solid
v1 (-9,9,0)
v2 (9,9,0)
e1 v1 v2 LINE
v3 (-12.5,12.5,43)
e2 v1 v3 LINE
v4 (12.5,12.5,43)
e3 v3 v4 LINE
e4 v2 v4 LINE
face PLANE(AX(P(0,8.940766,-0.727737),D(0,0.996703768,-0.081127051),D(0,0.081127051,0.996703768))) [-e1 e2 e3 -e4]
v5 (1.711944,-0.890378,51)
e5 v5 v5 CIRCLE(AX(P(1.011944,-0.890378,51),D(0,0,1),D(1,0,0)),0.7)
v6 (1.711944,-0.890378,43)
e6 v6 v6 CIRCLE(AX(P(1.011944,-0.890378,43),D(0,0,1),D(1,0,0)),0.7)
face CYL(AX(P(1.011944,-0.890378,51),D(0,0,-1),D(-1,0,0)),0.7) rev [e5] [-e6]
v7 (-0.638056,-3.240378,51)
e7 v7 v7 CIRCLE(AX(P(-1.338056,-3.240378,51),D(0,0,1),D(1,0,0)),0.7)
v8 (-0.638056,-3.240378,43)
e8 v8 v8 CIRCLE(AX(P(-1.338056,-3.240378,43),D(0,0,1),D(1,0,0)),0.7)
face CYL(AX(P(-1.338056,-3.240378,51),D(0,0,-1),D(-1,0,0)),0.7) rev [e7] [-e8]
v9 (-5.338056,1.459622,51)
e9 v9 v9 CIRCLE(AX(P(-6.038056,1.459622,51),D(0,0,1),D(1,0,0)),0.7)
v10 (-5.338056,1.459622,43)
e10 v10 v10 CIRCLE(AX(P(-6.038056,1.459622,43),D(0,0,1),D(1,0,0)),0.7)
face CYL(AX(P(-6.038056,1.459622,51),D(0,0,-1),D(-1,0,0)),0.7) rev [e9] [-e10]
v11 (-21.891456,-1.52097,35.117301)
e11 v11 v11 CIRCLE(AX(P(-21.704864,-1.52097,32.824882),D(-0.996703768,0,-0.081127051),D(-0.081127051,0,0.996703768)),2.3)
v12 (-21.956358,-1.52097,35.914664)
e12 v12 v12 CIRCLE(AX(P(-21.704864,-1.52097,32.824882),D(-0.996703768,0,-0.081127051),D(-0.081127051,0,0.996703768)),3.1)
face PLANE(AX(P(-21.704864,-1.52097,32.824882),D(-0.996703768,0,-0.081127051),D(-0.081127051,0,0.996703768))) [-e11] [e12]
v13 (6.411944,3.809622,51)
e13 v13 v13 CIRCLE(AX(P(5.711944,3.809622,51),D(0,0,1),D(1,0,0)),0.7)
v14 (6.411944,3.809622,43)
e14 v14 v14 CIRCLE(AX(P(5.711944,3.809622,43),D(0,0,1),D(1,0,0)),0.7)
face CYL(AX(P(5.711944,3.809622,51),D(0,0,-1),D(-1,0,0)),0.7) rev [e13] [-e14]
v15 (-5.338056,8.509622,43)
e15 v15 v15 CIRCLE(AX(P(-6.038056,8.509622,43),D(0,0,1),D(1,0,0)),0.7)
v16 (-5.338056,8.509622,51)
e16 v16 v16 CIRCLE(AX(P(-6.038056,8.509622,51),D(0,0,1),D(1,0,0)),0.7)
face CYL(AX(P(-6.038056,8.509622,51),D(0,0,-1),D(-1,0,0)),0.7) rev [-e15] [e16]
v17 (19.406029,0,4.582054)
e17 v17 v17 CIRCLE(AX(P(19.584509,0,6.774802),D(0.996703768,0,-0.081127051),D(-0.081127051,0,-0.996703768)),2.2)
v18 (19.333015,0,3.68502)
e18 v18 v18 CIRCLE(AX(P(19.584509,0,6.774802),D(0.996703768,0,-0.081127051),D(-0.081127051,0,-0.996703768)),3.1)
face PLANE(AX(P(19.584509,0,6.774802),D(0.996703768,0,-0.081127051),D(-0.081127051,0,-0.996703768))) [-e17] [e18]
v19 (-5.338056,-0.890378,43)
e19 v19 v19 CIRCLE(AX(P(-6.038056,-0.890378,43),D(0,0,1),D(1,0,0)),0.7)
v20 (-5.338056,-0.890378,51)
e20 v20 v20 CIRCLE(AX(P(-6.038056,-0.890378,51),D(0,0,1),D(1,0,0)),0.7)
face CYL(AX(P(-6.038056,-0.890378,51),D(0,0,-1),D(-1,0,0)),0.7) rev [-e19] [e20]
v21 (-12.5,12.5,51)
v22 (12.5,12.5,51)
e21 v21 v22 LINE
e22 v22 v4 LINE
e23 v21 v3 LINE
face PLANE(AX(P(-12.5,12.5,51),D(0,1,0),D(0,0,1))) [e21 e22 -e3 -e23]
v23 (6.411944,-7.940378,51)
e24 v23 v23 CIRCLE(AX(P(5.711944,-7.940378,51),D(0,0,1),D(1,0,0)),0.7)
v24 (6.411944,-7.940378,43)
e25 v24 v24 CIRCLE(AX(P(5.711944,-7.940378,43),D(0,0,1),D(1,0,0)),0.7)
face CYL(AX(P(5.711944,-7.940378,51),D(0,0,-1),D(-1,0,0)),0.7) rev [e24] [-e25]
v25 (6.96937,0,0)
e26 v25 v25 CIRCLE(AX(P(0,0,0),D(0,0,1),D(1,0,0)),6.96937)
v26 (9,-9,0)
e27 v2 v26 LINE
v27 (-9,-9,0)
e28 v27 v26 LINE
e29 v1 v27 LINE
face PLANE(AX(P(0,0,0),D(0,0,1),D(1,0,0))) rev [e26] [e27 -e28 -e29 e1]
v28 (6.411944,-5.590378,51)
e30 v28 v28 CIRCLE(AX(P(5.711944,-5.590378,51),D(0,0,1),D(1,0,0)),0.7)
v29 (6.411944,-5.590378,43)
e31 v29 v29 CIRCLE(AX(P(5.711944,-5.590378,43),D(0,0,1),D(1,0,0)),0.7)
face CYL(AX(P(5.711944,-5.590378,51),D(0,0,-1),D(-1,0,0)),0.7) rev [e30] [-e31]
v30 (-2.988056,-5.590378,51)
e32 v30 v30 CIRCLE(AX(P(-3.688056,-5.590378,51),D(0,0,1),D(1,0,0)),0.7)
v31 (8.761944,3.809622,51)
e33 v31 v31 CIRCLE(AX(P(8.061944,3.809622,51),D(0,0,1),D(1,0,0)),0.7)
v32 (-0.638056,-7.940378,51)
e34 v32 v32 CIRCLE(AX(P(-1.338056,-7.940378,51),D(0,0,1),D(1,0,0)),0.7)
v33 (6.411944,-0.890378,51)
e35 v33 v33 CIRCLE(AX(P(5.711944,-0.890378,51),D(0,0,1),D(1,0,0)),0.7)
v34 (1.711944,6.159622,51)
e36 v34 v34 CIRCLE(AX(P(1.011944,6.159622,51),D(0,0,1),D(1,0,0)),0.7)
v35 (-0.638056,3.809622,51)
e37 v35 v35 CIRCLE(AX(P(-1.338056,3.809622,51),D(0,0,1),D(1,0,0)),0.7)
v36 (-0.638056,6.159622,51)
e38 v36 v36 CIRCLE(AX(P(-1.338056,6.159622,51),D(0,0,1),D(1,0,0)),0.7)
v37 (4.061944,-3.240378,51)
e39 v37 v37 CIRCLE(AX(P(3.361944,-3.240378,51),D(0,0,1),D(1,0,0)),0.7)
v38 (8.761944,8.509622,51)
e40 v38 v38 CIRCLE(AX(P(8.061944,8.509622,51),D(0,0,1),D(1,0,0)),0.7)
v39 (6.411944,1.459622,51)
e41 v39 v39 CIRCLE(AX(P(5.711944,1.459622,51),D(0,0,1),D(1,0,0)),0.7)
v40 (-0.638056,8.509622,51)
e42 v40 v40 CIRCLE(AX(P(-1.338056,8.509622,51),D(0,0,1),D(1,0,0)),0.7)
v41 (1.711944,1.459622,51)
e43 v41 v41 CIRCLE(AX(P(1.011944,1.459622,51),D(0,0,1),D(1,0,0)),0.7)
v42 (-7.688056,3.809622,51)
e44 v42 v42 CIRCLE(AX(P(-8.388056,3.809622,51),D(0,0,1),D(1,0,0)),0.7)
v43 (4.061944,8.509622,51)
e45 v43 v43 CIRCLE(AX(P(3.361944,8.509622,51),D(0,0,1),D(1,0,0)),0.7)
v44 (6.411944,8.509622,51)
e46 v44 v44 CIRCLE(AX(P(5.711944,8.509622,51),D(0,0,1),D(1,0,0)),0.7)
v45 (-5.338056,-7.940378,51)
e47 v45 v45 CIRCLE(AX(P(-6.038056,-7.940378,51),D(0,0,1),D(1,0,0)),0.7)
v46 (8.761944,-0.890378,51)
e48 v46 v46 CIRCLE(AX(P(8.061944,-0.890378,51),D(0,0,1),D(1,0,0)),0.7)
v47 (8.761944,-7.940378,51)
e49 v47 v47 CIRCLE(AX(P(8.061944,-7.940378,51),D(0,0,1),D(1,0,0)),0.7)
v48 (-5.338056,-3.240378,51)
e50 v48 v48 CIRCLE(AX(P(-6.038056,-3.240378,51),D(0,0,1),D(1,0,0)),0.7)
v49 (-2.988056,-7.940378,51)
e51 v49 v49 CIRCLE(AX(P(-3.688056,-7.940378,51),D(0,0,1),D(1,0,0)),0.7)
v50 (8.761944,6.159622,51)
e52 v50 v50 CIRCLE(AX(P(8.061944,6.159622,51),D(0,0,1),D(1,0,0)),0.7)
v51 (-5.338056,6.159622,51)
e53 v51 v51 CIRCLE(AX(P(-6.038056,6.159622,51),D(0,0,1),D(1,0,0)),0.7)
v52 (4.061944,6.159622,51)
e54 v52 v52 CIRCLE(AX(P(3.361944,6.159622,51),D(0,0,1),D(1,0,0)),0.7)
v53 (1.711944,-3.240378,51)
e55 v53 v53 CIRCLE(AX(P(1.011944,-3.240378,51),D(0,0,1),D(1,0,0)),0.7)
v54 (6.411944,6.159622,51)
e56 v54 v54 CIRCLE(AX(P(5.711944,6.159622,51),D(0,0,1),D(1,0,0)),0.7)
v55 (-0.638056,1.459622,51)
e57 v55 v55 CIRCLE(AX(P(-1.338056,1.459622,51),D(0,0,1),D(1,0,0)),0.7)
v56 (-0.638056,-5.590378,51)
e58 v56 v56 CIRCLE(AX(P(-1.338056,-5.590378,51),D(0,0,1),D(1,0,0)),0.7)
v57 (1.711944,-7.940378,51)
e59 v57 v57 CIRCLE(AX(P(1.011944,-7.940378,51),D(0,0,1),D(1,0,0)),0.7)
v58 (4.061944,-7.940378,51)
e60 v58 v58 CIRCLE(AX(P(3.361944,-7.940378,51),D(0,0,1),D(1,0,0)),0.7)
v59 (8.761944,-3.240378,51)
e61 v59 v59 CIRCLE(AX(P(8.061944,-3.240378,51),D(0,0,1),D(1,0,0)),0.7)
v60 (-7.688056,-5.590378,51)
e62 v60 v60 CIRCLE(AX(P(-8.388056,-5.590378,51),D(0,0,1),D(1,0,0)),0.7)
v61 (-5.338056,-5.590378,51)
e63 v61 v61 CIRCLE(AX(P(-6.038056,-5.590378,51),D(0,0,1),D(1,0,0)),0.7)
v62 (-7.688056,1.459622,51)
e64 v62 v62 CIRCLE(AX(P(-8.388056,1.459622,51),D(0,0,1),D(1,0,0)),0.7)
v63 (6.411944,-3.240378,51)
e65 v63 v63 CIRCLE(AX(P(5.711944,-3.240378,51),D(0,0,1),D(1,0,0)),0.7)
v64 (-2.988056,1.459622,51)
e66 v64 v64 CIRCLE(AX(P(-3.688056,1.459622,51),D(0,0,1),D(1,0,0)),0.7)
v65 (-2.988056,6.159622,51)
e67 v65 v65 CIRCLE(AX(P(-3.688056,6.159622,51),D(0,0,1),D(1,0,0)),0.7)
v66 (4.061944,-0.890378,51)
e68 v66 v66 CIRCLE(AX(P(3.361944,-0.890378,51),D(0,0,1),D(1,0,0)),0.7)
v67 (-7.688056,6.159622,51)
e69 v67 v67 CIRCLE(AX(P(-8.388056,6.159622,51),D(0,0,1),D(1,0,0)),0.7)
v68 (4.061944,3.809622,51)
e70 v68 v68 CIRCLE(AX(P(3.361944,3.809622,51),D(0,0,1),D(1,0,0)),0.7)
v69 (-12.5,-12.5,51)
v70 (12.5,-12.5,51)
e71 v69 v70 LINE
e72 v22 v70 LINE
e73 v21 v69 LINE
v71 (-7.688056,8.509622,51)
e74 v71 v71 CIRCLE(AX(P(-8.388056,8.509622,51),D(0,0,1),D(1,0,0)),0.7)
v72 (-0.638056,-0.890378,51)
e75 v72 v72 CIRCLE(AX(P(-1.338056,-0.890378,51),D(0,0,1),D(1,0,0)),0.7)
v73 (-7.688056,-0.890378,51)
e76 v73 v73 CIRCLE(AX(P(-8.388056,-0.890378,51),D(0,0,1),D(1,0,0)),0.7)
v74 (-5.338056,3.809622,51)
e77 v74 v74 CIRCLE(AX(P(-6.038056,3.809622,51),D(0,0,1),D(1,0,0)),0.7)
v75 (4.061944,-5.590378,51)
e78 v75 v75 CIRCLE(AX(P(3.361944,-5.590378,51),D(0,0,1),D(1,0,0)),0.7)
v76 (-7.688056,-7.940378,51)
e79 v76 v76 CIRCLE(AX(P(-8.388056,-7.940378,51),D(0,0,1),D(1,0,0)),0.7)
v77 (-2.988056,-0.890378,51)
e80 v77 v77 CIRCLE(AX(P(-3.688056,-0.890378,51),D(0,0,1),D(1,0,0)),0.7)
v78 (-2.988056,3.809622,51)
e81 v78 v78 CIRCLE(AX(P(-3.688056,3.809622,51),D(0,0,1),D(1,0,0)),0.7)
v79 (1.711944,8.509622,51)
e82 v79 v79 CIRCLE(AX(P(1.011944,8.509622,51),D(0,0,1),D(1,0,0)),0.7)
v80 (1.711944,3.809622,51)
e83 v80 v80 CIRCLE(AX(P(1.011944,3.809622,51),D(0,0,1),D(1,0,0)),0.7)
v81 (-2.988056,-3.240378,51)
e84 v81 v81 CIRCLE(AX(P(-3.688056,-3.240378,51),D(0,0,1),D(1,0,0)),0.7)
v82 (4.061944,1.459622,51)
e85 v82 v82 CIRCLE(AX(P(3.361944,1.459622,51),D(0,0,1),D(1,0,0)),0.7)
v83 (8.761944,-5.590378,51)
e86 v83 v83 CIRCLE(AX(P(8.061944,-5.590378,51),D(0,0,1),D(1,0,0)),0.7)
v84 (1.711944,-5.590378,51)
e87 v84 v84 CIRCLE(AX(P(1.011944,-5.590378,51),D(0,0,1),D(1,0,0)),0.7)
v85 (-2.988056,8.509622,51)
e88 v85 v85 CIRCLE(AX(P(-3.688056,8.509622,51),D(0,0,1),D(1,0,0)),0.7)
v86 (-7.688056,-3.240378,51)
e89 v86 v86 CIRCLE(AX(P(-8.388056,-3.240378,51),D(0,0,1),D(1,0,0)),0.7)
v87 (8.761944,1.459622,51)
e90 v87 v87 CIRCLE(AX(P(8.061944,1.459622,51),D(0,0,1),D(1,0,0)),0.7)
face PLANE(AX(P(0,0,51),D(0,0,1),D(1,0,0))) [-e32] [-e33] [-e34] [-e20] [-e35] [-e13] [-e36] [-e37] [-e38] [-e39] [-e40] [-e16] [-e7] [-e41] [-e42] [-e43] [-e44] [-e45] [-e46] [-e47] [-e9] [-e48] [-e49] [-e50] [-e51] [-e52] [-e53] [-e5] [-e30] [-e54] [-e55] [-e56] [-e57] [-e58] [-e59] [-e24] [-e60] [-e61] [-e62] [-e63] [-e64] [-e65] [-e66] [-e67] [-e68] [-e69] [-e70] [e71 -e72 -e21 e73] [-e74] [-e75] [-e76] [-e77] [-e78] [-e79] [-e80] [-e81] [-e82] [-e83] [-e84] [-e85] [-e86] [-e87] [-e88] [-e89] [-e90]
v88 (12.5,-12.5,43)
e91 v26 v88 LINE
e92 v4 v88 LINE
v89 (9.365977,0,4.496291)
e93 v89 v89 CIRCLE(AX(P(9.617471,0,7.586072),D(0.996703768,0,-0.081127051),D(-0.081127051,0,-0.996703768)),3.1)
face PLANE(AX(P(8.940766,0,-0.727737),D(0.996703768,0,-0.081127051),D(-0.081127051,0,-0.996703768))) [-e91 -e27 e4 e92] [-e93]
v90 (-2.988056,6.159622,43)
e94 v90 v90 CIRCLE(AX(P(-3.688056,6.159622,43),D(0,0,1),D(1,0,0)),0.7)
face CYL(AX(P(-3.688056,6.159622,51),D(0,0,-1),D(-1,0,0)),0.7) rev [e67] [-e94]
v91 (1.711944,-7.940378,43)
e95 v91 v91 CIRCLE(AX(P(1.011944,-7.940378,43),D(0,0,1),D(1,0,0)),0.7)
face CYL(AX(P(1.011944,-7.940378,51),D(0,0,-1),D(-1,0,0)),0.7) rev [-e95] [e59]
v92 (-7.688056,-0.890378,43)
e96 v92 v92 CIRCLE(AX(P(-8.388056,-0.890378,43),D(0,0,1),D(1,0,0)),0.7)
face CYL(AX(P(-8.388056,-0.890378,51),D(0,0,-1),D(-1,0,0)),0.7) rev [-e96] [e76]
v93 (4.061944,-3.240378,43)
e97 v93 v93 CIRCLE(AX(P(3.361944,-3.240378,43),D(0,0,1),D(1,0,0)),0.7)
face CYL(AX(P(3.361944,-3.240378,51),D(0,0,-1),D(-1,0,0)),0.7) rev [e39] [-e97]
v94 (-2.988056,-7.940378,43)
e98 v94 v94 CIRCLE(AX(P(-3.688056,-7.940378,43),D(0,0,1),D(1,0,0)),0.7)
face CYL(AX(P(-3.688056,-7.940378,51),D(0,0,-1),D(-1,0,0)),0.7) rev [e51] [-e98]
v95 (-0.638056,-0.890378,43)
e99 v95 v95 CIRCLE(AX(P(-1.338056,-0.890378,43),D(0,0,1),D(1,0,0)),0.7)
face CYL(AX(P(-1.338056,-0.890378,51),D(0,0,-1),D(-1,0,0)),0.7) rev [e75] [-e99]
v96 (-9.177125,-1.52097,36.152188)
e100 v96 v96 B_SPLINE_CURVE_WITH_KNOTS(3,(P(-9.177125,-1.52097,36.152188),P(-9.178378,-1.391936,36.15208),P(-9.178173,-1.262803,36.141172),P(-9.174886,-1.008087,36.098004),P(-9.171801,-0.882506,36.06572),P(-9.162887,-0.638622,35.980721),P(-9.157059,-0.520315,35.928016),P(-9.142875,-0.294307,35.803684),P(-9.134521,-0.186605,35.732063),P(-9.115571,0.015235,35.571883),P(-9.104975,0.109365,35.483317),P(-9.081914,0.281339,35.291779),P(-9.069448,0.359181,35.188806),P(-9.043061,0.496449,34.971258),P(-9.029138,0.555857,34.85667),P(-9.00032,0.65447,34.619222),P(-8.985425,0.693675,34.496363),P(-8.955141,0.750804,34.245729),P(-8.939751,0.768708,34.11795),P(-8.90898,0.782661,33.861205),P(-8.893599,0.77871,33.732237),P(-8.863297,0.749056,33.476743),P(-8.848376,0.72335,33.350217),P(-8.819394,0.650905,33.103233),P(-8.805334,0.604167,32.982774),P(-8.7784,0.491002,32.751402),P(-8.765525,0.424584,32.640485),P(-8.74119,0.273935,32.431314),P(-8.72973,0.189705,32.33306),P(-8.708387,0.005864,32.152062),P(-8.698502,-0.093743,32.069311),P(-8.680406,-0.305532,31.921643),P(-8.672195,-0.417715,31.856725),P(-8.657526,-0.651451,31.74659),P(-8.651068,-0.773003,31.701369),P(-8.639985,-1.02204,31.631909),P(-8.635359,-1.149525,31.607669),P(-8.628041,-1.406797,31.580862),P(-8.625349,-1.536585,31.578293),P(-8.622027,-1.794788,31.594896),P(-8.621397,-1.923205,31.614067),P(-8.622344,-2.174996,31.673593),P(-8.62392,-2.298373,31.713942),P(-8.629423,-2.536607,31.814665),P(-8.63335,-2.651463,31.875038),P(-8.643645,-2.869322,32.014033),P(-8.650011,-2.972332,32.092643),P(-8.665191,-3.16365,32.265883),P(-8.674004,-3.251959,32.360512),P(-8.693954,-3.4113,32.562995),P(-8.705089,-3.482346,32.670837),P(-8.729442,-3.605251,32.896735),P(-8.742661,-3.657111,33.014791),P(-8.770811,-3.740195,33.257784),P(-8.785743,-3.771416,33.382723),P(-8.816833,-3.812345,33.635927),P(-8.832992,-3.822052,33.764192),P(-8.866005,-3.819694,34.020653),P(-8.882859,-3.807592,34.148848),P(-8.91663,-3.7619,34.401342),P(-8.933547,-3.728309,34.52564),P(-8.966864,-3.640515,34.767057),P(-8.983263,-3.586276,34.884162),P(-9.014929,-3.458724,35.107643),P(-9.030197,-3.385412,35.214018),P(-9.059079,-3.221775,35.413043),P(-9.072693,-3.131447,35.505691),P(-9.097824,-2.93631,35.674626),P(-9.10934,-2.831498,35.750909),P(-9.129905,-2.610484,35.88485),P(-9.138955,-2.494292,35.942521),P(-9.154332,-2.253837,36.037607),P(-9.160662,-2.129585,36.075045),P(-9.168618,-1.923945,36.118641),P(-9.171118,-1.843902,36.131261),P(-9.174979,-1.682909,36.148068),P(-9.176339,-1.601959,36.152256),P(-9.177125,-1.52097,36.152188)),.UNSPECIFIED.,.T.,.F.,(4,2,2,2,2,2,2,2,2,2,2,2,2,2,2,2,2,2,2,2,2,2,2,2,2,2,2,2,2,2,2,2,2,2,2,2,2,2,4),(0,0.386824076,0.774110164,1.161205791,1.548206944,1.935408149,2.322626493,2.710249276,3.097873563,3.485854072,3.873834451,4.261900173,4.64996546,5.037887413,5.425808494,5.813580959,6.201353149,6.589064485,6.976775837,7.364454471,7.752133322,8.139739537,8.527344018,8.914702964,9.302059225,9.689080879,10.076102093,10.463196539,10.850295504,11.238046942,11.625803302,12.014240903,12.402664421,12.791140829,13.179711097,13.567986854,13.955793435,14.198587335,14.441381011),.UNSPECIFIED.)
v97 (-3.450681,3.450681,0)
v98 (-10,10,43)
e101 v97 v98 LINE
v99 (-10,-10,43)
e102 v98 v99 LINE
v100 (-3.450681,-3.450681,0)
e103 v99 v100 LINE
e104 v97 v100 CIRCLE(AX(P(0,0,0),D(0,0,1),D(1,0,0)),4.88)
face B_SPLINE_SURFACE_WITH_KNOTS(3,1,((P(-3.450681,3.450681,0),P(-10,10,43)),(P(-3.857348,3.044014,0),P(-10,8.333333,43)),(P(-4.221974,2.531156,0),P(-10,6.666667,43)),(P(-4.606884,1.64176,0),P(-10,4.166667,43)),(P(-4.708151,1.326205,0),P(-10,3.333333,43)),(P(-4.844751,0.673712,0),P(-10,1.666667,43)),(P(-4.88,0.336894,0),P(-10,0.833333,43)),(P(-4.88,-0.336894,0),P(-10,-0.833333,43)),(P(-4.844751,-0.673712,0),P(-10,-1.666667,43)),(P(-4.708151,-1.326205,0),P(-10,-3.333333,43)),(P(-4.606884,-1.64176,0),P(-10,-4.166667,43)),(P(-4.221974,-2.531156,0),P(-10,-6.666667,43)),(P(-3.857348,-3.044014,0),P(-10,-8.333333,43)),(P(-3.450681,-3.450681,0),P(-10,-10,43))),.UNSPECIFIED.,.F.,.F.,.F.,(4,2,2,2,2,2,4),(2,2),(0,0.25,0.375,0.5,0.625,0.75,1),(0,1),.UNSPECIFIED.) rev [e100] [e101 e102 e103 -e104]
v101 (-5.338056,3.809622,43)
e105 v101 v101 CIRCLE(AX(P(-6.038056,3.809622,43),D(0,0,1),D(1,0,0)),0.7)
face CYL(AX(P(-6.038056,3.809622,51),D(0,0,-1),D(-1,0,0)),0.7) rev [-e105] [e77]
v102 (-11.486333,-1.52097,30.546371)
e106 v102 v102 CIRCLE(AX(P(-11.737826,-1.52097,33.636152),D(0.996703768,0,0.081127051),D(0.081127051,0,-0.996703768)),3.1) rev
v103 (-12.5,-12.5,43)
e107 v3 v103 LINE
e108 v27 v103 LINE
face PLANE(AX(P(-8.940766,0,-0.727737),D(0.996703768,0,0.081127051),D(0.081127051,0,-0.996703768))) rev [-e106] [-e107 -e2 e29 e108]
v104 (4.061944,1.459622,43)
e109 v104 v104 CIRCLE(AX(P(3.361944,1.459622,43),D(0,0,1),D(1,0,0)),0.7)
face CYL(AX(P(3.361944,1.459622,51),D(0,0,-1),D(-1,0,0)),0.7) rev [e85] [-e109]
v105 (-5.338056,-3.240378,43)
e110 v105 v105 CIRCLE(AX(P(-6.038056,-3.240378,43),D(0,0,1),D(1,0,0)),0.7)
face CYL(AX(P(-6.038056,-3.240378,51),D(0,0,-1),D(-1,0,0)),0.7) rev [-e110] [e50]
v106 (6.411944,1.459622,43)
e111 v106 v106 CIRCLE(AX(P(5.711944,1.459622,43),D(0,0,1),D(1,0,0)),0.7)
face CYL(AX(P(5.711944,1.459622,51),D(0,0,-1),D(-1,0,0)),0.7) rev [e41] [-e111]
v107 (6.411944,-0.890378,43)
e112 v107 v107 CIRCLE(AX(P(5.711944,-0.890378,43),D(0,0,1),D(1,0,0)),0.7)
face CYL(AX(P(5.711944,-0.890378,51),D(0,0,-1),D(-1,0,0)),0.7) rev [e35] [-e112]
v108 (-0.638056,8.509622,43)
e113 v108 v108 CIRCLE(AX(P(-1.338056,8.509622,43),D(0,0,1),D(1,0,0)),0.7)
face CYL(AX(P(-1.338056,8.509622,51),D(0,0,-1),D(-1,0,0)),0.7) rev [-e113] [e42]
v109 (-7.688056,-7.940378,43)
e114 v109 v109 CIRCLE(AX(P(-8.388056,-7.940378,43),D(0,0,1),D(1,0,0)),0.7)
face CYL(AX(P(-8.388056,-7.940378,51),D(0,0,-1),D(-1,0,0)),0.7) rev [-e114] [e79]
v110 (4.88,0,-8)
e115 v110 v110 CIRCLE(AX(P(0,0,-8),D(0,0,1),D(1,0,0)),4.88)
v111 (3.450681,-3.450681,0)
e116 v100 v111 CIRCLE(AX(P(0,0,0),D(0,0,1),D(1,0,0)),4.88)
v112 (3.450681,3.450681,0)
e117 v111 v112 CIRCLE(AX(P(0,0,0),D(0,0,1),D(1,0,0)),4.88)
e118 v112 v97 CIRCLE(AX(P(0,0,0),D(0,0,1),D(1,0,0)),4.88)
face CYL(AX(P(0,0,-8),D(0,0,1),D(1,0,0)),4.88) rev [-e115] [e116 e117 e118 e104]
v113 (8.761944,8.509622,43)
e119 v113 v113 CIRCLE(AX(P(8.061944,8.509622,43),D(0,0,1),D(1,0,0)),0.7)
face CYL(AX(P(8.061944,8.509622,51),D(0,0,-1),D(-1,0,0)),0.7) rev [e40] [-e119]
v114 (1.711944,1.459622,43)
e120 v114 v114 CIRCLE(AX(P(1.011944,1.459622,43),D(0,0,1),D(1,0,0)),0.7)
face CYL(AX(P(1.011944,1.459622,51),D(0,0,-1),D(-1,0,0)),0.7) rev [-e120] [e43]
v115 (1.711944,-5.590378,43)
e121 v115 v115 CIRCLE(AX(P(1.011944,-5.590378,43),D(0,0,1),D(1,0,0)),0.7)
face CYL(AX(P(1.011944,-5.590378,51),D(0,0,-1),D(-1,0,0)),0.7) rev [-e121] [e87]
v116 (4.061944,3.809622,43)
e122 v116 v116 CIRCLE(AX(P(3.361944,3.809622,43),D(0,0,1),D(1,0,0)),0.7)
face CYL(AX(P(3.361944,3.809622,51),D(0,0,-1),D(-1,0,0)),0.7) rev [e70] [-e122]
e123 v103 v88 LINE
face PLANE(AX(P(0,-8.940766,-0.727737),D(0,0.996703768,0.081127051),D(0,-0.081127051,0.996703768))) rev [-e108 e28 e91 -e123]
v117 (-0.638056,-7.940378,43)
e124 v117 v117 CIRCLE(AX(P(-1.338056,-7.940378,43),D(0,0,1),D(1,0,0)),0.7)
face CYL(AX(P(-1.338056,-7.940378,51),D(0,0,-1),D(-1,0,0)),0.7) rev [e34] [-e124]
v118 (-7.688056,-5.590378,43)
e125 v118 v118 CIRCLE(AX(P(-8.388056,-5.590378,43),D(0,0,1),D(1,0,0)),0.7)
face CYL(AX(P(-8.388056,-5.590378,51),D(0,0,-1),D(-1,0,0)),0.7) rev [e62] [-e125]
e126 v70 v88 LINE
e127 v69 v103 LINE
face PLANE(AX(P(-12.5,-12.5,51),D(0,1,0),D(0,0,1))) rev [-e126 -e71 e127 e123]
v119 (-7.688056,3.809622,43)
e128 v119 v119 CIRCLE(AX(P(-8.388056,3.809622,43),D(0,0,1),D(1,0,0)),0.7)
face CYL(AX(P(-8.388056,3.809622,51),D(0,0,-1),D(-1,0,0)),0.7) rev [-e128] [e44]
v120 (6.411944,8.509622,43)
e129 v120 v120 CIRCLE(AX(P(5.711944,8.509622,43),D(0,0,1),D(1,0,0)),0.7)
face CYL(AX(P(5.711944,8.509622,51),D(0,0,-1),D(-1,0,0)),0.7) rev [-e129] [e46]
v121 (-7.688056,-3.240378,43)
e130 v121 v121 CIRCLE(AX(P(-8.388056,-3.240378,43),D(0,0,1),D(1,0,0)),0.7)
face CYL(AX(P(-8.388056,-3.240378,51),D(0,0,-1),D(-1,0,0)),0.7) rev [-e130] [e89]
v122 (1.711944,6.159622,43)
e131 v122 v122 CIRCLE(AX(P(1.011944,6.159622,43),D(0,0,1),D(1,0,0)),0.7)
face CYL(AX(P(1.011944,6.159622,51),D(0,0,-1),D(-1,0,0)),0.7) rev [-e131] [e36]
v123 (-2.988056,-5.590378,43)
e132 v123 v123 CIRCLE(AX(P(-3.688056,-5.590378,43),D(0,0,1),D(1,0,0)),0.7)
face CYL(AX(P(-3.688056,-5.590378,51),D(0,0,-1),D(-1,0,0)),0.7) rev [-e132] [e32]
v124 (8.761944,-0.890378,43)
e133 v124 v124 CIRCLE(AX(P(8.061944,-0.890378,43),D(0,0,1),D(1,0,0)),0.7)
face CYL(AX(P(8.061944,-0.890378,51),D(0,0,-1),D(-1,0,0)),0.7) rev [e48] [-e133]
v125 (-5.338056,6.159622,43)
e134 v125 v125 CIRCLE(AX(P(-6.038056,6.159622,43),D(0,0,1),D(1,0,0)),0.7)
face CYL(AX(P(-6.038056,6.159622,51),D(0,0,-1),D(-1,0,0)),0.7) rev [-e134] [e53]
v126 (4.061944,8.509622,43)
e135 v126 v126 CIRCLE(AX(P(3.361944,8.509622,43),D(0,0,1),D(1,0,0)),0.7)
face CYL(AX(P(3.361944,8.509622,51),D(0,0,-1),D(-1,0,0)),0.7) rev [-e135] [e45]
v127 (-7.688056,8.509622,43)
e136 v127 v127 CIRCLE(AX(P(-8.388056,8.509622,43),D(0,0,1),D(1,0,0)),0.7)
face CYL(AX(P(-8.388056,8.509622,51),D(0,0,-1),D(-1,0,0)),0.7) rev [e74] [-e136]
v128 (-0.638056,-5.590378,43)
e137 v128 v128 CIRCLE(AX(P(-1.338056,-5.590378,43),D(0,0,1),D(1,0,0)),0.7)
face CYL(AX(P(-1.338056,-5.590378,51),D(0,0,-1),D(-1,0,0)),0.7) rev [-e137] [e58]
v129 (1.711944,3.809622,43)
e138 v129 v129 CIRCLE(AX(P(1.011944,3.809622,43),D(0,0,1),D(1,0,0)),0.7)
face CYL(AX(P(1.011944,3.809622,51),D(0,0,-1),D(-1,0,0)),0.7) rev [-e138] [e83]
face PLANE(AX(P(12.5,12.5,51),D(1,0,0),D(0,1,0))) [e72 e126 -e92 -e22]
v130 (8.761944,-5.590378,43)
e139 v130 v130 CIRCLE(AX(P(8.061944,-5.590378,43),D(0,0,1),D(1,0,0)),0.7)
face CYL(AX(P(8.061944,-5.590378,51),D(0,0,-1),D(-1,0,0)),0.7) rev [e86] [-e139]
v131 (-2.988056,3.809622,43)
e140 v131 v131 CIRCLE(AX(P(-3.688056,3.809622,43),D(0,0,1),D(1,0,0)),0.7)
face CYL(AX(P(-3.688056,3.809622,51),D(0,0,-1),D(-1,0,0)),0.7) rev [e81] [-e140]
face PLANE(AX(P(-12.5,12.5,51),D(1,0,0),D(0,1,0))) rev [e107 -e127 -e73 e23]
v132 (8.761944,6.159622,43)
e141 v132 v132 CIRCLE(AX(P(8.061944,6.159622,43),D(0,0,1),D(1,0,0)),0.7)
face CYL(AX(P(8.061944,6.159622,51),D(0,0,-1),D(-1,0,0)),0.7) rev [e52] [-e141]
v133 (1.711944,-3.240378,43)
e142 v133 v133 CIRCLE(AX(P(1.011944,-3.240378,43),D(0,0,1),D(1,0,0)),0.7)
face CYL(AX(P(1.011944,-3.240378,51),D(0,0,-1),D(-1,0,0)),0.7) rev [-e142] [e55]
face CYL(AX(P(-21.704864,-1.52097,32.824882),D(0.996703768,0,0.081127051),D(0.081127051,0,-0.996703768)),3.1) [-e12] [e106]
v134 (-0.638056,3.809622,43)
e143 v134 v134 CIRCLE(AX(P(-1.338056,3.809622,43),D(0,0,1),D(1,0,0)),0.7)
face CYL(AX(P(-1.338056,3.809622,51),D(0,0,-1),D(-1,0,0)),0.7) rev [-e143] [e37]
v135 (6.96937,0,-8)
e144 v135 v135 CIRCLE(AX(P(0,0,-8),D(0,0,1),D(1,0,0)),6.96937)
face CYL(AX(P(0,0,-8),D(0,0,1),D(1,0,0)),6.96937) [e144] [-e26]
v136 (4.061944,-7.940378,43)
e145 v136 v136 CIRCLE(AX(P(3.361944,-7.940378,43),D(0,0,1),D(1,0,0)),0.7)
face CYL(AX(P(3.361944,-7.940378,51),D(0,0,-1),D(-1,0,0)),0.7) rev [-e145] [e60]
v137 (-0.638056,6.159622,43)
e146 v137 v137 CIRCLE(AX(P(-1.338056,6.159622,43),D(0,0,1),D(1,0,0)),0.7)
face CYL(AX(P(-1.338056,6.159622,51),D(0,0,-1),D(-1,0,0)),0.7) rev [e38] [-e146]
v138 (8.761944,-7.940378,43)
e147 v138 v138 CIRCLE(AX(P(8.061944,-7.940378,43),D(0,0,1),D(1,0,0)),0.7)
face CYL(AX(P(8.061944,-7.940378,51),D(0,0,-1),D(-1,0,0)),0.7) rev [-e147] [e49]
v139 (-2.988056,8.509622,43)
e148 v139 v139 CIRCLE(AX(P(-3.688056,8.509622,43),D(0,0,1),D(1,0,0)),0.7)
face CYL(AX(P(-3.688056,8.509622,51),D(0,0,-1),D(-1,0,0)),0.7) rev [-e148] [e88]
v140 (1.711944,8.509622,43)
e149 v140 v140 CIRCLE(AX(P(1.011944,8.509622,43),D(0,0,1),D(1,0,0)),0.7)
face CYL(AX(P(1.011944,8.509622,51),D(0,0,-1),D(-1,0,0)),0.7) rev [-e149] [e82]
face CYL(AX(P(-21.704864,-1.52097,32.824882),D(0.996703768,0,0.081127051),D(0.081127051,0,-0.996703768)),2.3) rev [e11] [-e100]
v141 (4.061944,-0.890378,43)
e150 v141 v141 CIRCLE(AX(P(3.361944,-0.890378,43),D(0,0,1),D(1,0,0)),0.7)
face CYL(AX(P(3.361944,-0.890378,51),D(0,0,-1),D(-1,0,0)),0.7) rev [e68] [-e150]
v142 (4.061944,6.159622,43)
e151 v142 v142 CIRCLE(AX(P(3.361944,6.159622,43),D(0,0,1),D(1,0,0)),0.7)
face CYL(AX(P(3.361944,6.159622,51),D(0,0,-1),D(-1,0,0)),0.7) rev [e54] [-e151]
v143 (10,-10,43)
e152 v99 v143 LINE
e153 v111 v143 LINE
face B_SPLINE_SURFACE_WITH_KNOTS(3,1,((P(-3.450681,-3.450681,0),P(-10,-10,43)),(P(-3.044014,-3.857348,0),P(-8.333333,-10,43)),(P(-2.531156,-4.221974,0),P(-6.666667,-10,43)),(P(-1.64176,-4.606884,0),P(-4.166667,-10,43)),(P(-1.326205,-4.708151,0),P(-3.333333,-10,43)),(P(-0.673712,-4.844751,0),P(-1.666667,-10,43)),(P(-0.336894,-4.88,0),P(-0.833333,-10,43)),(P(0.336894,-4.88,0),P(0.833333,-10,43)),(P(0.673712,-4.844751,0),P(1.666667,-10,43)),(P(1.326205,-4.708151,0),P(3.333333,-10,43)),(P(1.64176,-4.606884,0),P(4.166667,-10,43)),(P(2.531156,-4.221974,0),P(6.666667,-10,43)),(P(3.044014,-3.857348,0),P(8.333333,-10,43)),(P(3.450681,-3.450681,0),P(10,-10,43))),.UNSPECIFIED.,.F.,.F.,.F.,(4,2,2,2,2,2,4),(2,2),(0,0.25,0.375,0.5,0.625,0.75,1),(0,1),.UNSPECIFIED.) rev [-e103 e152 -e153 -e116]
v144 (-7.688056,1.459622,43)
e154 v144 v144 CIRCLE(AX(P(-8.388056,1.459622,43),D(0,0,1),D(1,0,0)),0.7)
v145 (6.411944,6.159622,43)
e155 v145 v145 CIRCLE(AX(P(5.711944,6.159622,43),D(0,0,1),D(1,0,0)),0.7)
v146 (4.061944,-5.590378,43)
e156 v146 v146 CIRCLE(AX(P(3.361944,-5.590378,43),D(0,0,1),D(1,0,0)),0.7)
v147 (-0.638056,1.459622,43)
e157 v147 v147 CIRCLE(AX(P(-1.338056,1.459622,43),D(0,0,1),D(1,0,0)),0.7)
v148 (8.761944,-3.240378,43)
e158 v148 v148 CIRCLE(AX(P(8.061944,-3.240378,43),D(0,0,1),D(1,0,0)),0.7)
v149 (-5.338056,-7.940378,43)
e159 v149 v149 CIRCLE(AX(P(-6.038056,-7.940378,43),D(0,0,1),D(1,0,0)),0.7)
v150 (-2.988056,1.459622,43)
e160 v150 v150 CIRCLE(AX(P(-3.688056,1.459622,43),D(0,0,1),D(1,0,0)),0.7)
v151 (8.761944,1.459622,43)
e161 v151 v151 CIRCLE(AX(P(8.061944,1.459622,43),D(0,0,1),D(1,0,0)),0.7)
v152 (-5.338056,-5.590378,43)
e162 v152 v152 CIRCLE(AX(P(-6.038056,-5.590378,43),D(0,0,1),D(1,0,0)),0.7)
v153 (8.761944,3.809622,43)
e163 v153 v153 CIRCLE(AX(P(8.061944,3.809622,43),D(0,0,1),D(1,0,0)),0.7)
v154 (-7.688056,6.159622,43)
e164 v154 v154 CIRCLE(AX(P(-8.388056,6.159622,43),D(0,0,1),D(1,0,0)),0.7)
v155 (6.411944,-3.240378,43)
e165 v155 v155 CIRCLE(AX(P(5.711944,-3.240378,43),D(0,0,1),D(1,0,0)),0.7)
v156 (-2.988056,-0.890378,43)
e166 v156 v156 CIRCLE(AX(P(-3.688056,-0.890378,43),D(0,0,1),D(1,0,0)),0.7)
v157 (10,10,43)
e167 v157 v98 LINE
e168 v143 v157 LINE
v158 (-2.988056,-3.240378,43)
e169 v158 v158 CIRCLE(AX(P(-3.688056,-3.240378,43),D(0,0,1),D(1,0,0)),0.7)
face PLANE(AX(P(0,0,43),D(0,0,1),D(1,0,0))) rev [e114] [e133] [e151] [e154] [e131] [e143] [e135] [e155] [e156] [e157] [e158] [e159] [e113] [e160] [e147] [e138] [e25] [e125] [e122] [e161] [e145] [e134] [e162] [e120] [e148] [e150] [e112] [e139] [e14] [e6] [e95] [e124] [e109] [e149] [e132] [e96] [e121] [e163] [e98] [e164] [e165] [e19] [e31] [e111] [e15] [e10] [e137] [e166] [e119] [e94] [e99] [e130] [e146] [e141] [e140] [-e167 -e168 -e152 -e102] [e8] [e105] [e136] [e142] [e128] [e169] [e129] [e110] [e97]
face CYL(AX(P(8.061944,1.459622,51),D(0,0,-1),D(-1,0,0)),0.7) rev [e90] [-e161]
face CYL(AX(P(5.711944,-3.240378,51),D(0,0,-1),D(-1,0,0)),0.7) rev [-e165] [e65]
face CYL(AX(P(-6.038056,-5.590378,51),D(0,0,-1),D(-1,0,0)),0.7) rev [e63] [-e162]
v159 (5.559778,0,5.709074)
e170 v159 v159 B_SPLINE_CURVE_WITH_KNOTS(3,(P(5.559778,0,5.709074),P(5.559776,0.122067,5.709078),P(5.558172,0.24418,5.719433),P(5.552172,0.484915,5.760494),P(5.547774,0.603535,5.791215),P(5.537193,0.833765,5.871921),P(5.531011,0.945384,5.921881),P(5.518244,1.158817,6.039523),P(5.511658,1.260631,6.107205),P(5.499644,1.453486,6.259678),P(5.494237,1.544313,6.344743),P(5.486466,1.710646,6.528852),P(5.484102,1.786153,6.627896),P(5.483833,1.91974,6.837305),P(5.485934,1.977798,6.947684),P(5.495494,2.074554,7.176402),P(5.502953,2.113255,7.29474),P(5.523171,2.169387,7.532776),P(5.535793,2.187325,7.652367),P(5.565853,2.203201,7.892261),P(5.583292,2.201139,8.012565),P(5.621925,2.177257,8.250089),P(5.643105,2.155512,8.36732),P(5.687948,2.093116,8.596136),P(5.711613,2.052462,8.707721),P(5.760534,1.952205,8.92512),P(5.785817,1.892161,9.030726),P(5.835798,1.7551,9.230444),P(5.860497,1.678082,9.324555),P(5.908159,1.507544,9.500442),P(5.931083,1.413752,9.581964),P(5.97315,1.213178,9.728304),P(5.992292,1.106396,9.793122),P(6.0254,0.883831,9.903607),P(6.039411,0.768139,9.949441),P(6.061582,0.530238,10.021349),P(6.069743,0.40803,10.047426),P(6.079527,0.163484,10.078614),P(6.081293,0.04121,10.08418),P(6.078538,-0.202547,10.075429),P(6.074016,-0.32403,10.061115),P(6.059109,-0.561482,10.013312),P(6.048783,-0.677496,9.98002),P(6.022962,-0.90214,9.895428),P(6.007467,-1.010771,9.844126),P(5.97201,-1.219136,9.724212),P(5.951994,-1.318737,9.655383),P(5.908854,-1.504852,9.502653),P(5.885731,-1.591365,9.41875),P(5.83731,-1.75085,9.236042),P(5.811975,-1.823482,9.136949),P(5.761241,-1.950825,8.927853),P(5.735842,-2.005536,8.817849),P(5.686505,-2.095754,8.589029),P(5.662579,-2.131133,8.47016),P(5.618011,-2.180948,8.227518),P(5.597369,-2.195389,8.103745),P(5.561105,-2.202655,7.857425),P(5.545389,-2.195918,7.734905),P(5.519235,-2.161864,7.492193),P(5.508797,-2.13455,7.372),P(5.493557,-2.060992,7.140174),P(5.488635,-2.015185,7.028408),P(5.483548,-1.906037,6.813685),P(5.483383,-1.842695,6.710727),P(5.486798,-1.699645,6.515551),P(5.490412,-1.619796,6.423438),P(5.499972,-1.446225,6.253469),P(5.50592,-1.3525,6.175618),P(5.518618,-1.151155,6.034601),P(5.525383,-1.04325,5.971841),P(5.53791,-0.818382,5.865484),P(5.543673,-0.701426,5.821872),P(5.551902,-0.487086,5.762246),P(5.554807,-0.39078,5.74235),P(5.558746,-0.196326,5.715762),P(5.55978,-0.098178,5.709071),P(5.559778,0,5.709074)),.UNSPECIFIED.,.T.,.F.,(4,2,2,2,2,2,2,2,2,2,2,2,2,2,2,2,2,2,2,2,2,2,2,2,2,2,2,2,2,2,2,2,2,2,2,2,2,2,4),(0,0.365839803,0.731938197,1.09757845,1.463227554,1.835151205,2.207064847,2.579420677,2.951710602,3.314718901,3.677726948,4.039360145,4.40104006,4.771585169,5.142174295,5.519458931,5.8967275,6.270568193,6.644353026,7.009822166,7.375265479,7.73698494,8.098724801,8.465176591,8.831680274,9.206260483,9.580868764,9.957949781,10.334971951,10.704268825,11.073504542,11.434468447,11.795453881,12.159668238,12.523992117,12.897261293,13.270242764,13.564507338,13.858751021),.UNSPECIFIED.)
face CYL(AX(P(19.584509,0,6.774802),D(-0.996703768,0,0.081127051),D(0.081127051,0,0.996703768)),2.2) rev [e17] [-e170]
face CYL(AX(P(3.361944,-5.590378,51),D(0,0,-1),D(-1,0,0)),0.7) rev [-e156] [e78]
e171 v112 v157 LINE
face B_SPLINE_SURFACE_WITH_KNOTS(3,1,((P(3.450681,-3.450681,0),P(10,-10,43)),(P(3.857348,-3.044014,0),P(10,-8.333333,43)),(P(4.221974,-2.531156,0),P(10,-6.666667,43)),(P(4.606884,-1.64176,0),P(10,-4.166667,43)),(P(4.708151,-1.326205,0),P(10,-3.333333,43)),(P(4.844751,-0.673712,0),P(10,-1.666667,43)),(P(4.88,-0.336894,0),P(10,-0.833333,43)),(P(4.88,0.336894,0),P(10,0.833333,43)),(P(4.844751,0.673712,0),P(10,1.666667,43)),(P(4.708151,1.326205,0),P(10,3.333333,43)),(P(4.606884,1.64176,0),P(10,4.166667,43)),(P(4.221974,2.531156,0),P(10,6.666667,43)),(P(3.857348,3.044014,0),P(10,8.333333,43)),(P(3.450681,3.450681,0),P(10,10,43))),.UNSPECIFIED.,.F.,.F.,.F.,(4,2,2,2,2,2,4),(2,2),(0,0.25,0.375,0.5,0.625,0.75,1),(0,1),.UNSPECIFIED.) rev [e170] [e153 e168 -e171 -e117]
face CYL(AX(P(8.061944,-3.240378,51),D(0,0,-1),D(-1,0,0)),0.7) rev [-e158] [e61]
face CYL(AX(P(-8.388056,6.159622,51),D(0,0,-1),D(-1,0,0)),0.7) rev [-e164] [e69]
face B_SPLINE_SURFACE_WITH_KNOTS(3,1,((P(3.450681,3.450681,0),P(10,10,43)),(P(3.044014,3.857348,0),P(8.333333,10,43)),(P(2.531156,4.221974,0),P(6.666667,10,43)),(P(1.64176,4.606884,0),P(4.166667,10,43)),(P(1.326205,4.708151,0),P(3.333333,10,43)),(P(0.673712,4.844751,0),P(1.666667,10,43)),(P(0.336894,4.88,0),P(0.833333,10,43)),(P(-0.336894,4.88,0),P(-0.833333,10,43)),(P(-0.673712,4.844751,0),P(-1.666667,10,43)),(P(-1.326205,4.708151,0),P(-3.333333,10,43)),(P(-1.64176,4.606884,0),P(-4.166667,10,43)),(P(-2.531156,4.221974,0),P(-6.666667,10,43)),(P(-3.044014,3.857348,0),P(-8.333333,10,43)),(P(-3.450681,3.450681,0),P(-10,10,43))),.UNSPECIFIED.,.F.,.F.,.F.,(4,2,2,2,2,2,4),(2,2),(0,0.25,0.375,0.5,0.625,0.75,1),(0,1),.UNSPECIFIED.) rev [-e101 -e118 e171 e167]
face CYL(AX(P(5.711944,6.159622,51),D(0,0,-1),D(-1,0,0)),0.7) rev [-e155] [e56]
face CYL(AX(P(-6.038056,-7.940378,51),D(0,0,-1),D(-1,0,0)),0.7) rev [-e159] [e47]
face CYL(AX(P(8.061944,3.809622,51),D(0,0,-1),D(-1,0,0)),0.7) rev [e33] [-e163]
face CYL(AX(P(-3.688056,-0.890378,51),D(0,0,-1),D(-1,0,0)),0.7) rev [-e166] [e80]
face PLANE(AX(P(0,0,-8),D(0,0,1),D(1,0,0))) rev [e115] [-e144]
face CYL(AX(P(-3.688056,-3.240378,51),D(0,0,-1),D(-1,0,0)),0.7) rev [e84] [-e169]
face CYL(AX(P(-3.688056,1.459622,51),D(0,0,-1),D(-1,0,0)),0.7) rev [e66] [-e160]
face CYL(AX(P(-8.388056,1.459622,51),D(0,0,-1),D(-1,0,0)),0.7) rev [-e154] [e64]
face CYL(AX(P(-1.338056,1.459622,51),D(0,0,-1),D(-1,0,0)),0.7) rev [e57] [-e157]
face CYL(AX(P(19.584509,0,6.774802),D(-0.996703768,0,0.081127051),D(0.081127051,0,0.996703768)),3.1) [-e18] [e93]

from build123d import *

# Parameters (mm, degrees)
SKETCH2_4_W         = 25
SKETCH2_4_H         = 25
BOSS_EXTRUDE2_DEPTH = 8
SKETCH5_R           = 0.7
CUT_EXTRUDE1_DEPTH  = 8
SKETCH6_R           = 3.1
SKETCH6_R_2         = 2.3
BOSS_EXTRUDE4_DEPTH = 10
CUT_EXTRUDE2_START  = -4
SKETCH6_4_R         = 2.3
CUT_EXTRUDE2_DEPTH  = 4
SKETCH9_R           = 3.1
SKETCH9_R_2         = 2.2
BOSS_EXTRUDE5_DEPTH = 10
SKETCH1_7_R         = 6.969369829
SKETCH1_7_R_2       = 4.88
BOSS_EXTRUDE7_DEPTH = 8
CUT_EXTRUDE3_START  = -20
SKETCH10_R          = 2.2
CUT_EXTRUDE3_DEPTH  = 20


with BuildPart() as part:
    # Sketch1 → Loft1 section 0
    with BuildSketch(Plane.XY):
        with BuildLine():
            Line((-9, 9), (9, 9))
            Line((9, 9), (9, -9))
            Line((9, -9), (-9, -9))
            Line((-9, -9), (-9, 9))
        make_face()
    # Sketch2 → Loft1 section 1
    with BuildSketch(Plane.XY.offset(43)):
        with BuildLine():
            Line((-12.5, 12.5), (12.5, 12.5))
            Line((12.5, 12.5), (12.5, -12.5))
            Line((12.5, -12.5), (-12.5, -12.5))
            Line((-12.5, -12.5), (-12.5, 12.5))
        make_face()
    loft()

    # Cut-Loft1: read off the stored shape, not the designer's step
    # Cut-Loft1: loft between two sections, ruled curve by curve
    cut_loft1_from = [
        Edge.make_bspline([(-3.450681092, -3.450681092, 0), (-3.044014426, -3.857347759, 0), (-2.531155679, -4.22197395, 0), (-1.641760344, -4.606883572, 0), (-1.326204919, -4.708150629, 0), (-0.673711552, -4.84475124, 0), (-0.336893697, -4.88, 0), (0.336893697, -4.88, 0), (0.673711552, -4.84475124, 0), (1.326204919, -4.708150629, 0), (1.641760344, -4.606883572, 0), (2.531155679, -4.22197395, 0), (3.044014426, -3.857347759, 0), (3.450681092, -3.450681092, 0)], [0, 0, 0, 0, 0.25, 0.25, 0.375, 0.375, 0.5, 0.5, 0.625, 0.625, 0.75, 0.75, 1, 1, 1, 1], 3),
        Edge.make_bspline([(3.450681092, -3.450681092, 0), (3.857347759, -3.044014426, 0), (4.22197395, -2.531155679, 0), (4.606883572, -1.641760344, 0), (4.708150629, -1.326204919, 0), (4.84475124, -0.673711552, 0), (4.88, -0.336893697, 0), (4.88, 0.336893697, 0), (4.84475124, 0.673711552, 0), (4.708150629, 1.326204919, 0), (4.606883572, 1.641760344, 0), (4.22197395, 2.531155679, 0), (3.857347759, 3.044014426, 0), (3.450681092, 3.450681092, 0)], [0, 0, 0, 0, 0.25, 0.25, 0.375, 0.375, 0.5, 0.5, 0.625, 0.625, 0.75, 0.75, 1, 1, 1, 1], 3),
        Edge.make_bspline([(-3.450681092, 3.450681092, 0), (-3.857347759, 3.044014426, 0), (-4.22197395, 2.531155679, 0), (-4.606883572, 1.641760344, 0), (-4.708150629, 1.326204919, 0), (-4.84475124, 0.673711552, 0), (-4.88, 0.336893697, 0), (-4.88, -0.336893697, 0), (-4.84475124, -0.673711552, 0), (-4.708150629, -1.326204919, 0), (-4.606883572, -1.641760344, 0), (-4.22197395, -2.531155679, 0), (-3.857347759, -3.044014426, 0), (-3.450681092, -3.450681092, 0)], [0, 0, 0, 0, 0.25, 0.25, 0.375, 0.375, 0.5, 0.5, 0.625, 0.625, 0.75, 0.75, 1, 1, 1, 1], 3),
        Edge.make_bspline([(3.450681092, 3.450681092, 0), (3.044014426, 3.857347759, 0), (2.531155679, 4.22197395, 0), (1.641760344, 4.606883572, 0), (1.326204919, 4.708150629, 0), (0.673711552, 4.84475124, 0), (0.336893697, 4.88, 0), (-0.336893697, 4.88, 0), (-0.673711552, 4.84475124, 0), (-1.326204919, 4.708150629, 0), (-1.641760344, 4.606883572, 0), (-2.531155679, 4.22197395, 0), (-3.044014426, 3.857347759, 0), (-3.450681092, 3.450681092, 0)], [0, 0, 0, 0, 0.25, 0.25, 0.375, 0.375, 0.5, 0.5, 0.625, 0.625, 0.75, 0.75, 1, 1, 1, 1], 3),
    ]
    cut_loft1_to = [
        Edge.make_bspline([(-10, -10, 43), (-8.333333333, -10, 43), (-6.666666667, -10, 43), (-4.166666667, -10, 43), (-3.333333333, -10, 43), (-1.666666667, -10, 43), (-0.833333333, -10, 43), (0.833333333, -10, 43), (1.666666667, -10, 43), (3.333333333, -10, 43), (4.166666667, -10, 43), (6.666666667, -10, 43), (8.333333333, -10, 43), (10, -10, 43)], [0, 0, 0, 0, 0.25, 0.25, 0.375, 0.375, 0.5, 0.5, 0.625, 0.625, 0.75, 0.75, 1, 1, 1, 1], 3),
        Edge.make_bspline([(10, -10, 43), (10, -8.333333333, 43), (10, -6.666666667, 43), (10, -4.166666667, 43), (10, -3.333333333, 43), (10, -1.666666667, 43), (10, -0.833333333, 43), (10, 0.833333333, 43), (10, 1.666666667, 43), (10, 3.333333333, 43), (10, 4.166666667, 43), (10, 6.666666667, 43), (10, 8.333333333, 43), (10, 10, 43)], [0, 0, 0, 0, 0.25, 0.25, 0.375, 0.375, 0.5, 0.5, 0.625, 0.625, 0.75, 0.75, 1, 1, 1, 1], 3),
        Edge.make_bspline([(-10, 10, 43), (-10, 8.333333333, 43), (-10, 6.666666667, 43), (-10, 4.166666667, 43), (-10, 3.333333333, 43), (-10, 1.666666667, 43), (-10, 0.833333333, 43), (-10, -0.833333333, 43), (-10, -1.666666667, 43), (-10, -3.333333333, 43), (-10, -4.166666667, 43), (-10, -6.666666667, 43), (-10, -8.333333333, 43), (-10, -10, 43)], [0, 0, 0, 0, 0.25, 0.25, 0.375, 0.375, 0.5, 0.5, 0.625, 0.625, 0.75, 0.75, 1, 1, 1, 1], 3),
        Edge.make_bspline([(10, 10, 43), (8.333333333, 10, 43), (6.666666667, 10, 43), (4.166666667, 10, 43), (3.333333333, 10, 43), (1.666666667, 10, 43), (0.833333333, 10, 43), (-0.833333333, 10, 43), (-1.666666667, 10, 43), (-3.333333333, 10, 43), (-4.166666667, 10, 43), (-6.666666667, 10, 43), (-8.333333333, 10, 43), (-10, 10, 43)], [0, 0, 0, 0, 0.25, 0.25, 0.375, 0.375, 0.5, 0.5, 0.625, 0.625, 0.75, 0.75, 1, 1, 1, 1], 3),
    ]
    cut_loft1 = Solid(Shell([*[Face.make_surface_from_curves(cut_loft1_from[k], cut_loft1_to[k]) for k in range(4)], Face(Wire(cut_loft1_from)), Face(Wire(cut_loft1_to))]))
    add(cut_loft1, mode=Mode.SUBTRACT)

    # Sketch2<4> → Boss-Extrude2 (add)
    with BuildSketch(Plane.XY.offset(43)):
        Rectangle(SKETCH2_4_W, SKETCH2_4_H)
    extrude(amount=BOSS_EXTRUDE2_DEPTH)

    # Sketch5 → Cut-Extrude1 (cut)
    with BuildSketch(Plane.XY.offset(43)):
        with Locations((-8.388056057, 8.509622087)):
            Circle(SKETCH5_R)
        with Locations((-6.038056057, 8.509622087)):
            Circle(SKETCH5_R)
        with Locations((-3.688056057, 8.509622087)):
            Circle(SKETCH5_R)
        with Locations((-1.338056057, 8.509622087)):
            Circle(SKETCH5_R)
        with Locations((1.011943943, 8.509622087)):
            Circle(SKETCH5_R)
        with Locations((3.361943943, 8.509622087)):
            Circle(SKETCH5_R)
        with Locations((5.711943943, 8.509622087)):
            Circle(SKETCH5_R)
        with Locations((8.061943943, 8.509622087)):
            Circle(SKETCH5_R)
        with Locations((-6.038056057, 6.159622087)):
            Circle(SKETCH5_R)
        with Locations((-3.688056057, 6.159622087)):
            Circle(SKETCH5_R)
        with Locations((-1.338056057, 6.159622087)):
            Circle(SKETCH5_R)
        with Locations((1.011943943, 6.159622087)):
            Circle(SKETCH5_R)
        with Locations((3.361943943, 6.159622087)):
            Circle(SKETCH5_R)
        with Locations((5.711943943, 6.159622087)):
            Circle(SKETCH5_R)
        with Locations((8.061943943, 6.159622087)):
            Circle(SKETCH5_R)
        with Locations((-6.038056057, 3.809622087)):
            Circle(SKETCH5_R)
        with Locations((-3.688056057, 3.809622087)):
            Circle(SKETCH5_R)
        with Locations((-1.338056057, 3.809622087)):
            Circle(SKETCH5_R)
        with Locations((1.011943943, 3.809622087)):
            Circle(SKETCH5_R)
        with Locations((3.361943943, 3.809622087)):
            Circle(SKETCH5_R)
        with Locations((5.711943943, 3.809622087)):
            Circle(SKETCH5_R)
        with Locations((8.061943943, 3.809622087)):
            Circle(SKETCH5_R)
        with Locations((-6.038056057, 1.459622087)):
            Circle(SKETCH5_R)
        with Locations((-3.688056057, 1.459622087)):
            Circle(SKETCH5_R)
        with Locations((-1.338056057, 1.459622087)):
            Circle(SKETCH5_R)
        with Locations((1.011943943, 1.459622087)):
            Circle(SKETCH5_R)
        with Locations((3.361943943, 1.459622087)):
            Circle(SKETCH5_R)
        with Locations((5.711943943, 1.459622087)):
            Circle(SKETCH5_R)
        with Locations((8.061943943, 1.459622087)):
            Circle(SKETCH5_R)
        with Locations((-6.038056057, -0.890377913)):
            Circle(SKETCH5_R)
        with Locations((-3.688056057, -0.890377913)):
            Circle(SKETCH5_R)
        with Locations((-1.338056057, -0.890377913)):
            Circle(SKETCH5_R)
        with Locations((1.011943943, -0.890377913)):
            Circle(SKETCH5_R)
        with Locations((3.361943943, -0.890377913)):
            Circle(SKETCH5_R)
        with Locations((5.711943943, -0.890377913)):
            Circle(SKETCH5_R)
        with Locations((8.061943943, -0.890377913)):
            Circle(SKETCH5_R)
        with Locations((-6.038056057, -3.240377913)):
            Circle(SKETCH5_R)
        with Locations((-3.688056057, -3.240377913)):
            Circle(SKETCH5_R)
        with Locations((-1.338056057, -3.240377913)):
            Circle(SKETCH5_R)
        with Locations((1.011943943, -3.240377913)):
            Circle(SKETCH5_R)
        with Locations((3.361943943, -3.240377913)):
            Circle(SKETCH5_R)
        with Locations((5.711943943, -3.240377913)):
            Circle(SKETCH5_R)
        with Locations((8.061943943, -3.240377913)):
            Circle(SKETCH5_R)
        with Locations((-6.038056057, -5.590377913)):
            Circle(SKETCH5_R)
        with Locations((-3.688056057, -5.590377913)):
            Circle(SKETCH5_R)
        with Locations((-1.338056057, -5.590377913)):
            Circle(SKETCH5_R)
        with Locations((1.011943943, -5.590377913)):
            Circle(SKETCH5_R)
        with Locations((3.361943943, -5.590377913)):
            Circle(SKETCH5_R)
        with Locations((5.711943943, -5.590377913)):
            Circle(SKETCH5_R)
        with Locations((8.061943943, -5.590377913)):
            Circle(SKETCH5_R)
        with Locations((-6.038056057, -7.940377913)):
            Circle(SKETCH5_R)
        with Locations((-3.688056057, -7.940377913)):
            Circle(SKETCH5_R)
        with Locations((-1.338056057, -7.940377913)):
            Circle(SKETCH5_R)
        with Locations((1.011943943, -7.940377913)):
            Circle(SKETCH5_R)
        with Locations((3.361943943, -7.940377913)):
            Circle(SKETCH5_R)
        with Locations((5.711943943, -7.940377913)):
            Circle(SKETCH5_R)
        with Locations((8.061943943, -7.940377913)):
            Circle(SKETCH5_R)
        with Locations((-8.388056057, 6.159622087)):
            Circle(SKETCH5_R)
        with Locations((-8.388056057, 3.809622087)):
            Circle(SKETCH5_R)
        with Locations((-8.388056057, 1.459622087)):
            Circle(SKETCH5_R)
        with Locations((-8.388056057, -0.890377913)):
            Circle(SKETCH5_R)
        with Locations((-8.388056057, -3.240377913)):
            Circle(SKETCH5_R)
        with Locations((-8.388056057, -5.590377913)):
            Circle(SKETCH5_R)
        with Locations((-8.388056057, -7.940377913)):
            Circle(SKETCH5_R)
    extrude(amount=CUT_EXTRUDE1_DEPTH, mode=Mode.SUBTRACT)

    # Sketch6 → Boss-Extrude4 (add)
    with BuildSketch(Plane(origin=(-8.940765615, 0, -0.727736736), x_dir=(-0.08112705090276601, 0, 0.9967037682339824), z_dir=(-0.9967037682339824, 0, -0.08112705090276602))):
        with Locations(Location((34.477535136, -1.520969622, 0), (0, 0, 180))):
            Circle(SKETCH6_R)
        with Locations((34.477535136, -1.520969622)):
            Circle(SKETCH6_R_2, mode=Mode.SUBTRACT)
    extrude(amount=BOSS_EXTRUDE4_DEPTH)

    # Sketch6<4> → Cut-Extrude2 (cut)
    with BuildSketch(Plane(origin=(-8.940765615, 0, -0.727736736), x_dir=(-0.08112705090276601, 0, 0.9967037682339824), z_dir=(-0.9967037682339824, 0, -0.08112705090276602)).offset(CUT_EXTRUDE2_START)):
        with Locations((34.477535136, -1.520969622)):
            Circle(SKETCH6_4_R)
    extrude(amount=CUT_EXTRUDE2_DEPTH, mode=Mode.SUBTRACT)

    # Sketch9 → Boss-Extrude5 (add)
    with BuildSketch(Plane(origin=(8.940765615, 0, -0.727736736), x_dir=(-0.08112705090276603, 0, -0.9967037682339824), z_dir=(0.9967037682339824, 0, -0.08112705090276605))):
        with Locations((-8.341303969, 0)):
            Circle(SKETCH9_R)
        with Locations((-8.341303969, 0)):
            Circle(SKETCH9_R_2, mode=Mode.SUBTRACT)
    extrude(amount=BOSS_EXTRUDE5_DEPTH)

    # Sketch1<7> → Boss-Extrude7 (add)
    with BuildSketch(Plane.XY):
        Circle(SKETCH1_7_R)
        Circle(SKETCH1_7_R_2, mode=Mode.SUBTRACT)
    extrude(amount=-BOSS_EXTRUDE7_DEPTH)

    # Sketch10 → Cut-Extrude3 (cut)
    with BuildSketch(Plane(origin=(18.907803297, 0, -1.539007245), x_dir=(-0.08112705090276605, 0, -0.9967037682339824), z_dir=(0.9967037682339824, 0, -0.08112705090276606)).offset(CUT_EXTRUDE3_START)):
        with Locations((-8.341303969, 0)):
            Circle(SKETCH10_R)
    extrude(amount=CUT_EXTRUDE3_DEPTH, mode=Mode.SUBTRACT)


solid = part.part
